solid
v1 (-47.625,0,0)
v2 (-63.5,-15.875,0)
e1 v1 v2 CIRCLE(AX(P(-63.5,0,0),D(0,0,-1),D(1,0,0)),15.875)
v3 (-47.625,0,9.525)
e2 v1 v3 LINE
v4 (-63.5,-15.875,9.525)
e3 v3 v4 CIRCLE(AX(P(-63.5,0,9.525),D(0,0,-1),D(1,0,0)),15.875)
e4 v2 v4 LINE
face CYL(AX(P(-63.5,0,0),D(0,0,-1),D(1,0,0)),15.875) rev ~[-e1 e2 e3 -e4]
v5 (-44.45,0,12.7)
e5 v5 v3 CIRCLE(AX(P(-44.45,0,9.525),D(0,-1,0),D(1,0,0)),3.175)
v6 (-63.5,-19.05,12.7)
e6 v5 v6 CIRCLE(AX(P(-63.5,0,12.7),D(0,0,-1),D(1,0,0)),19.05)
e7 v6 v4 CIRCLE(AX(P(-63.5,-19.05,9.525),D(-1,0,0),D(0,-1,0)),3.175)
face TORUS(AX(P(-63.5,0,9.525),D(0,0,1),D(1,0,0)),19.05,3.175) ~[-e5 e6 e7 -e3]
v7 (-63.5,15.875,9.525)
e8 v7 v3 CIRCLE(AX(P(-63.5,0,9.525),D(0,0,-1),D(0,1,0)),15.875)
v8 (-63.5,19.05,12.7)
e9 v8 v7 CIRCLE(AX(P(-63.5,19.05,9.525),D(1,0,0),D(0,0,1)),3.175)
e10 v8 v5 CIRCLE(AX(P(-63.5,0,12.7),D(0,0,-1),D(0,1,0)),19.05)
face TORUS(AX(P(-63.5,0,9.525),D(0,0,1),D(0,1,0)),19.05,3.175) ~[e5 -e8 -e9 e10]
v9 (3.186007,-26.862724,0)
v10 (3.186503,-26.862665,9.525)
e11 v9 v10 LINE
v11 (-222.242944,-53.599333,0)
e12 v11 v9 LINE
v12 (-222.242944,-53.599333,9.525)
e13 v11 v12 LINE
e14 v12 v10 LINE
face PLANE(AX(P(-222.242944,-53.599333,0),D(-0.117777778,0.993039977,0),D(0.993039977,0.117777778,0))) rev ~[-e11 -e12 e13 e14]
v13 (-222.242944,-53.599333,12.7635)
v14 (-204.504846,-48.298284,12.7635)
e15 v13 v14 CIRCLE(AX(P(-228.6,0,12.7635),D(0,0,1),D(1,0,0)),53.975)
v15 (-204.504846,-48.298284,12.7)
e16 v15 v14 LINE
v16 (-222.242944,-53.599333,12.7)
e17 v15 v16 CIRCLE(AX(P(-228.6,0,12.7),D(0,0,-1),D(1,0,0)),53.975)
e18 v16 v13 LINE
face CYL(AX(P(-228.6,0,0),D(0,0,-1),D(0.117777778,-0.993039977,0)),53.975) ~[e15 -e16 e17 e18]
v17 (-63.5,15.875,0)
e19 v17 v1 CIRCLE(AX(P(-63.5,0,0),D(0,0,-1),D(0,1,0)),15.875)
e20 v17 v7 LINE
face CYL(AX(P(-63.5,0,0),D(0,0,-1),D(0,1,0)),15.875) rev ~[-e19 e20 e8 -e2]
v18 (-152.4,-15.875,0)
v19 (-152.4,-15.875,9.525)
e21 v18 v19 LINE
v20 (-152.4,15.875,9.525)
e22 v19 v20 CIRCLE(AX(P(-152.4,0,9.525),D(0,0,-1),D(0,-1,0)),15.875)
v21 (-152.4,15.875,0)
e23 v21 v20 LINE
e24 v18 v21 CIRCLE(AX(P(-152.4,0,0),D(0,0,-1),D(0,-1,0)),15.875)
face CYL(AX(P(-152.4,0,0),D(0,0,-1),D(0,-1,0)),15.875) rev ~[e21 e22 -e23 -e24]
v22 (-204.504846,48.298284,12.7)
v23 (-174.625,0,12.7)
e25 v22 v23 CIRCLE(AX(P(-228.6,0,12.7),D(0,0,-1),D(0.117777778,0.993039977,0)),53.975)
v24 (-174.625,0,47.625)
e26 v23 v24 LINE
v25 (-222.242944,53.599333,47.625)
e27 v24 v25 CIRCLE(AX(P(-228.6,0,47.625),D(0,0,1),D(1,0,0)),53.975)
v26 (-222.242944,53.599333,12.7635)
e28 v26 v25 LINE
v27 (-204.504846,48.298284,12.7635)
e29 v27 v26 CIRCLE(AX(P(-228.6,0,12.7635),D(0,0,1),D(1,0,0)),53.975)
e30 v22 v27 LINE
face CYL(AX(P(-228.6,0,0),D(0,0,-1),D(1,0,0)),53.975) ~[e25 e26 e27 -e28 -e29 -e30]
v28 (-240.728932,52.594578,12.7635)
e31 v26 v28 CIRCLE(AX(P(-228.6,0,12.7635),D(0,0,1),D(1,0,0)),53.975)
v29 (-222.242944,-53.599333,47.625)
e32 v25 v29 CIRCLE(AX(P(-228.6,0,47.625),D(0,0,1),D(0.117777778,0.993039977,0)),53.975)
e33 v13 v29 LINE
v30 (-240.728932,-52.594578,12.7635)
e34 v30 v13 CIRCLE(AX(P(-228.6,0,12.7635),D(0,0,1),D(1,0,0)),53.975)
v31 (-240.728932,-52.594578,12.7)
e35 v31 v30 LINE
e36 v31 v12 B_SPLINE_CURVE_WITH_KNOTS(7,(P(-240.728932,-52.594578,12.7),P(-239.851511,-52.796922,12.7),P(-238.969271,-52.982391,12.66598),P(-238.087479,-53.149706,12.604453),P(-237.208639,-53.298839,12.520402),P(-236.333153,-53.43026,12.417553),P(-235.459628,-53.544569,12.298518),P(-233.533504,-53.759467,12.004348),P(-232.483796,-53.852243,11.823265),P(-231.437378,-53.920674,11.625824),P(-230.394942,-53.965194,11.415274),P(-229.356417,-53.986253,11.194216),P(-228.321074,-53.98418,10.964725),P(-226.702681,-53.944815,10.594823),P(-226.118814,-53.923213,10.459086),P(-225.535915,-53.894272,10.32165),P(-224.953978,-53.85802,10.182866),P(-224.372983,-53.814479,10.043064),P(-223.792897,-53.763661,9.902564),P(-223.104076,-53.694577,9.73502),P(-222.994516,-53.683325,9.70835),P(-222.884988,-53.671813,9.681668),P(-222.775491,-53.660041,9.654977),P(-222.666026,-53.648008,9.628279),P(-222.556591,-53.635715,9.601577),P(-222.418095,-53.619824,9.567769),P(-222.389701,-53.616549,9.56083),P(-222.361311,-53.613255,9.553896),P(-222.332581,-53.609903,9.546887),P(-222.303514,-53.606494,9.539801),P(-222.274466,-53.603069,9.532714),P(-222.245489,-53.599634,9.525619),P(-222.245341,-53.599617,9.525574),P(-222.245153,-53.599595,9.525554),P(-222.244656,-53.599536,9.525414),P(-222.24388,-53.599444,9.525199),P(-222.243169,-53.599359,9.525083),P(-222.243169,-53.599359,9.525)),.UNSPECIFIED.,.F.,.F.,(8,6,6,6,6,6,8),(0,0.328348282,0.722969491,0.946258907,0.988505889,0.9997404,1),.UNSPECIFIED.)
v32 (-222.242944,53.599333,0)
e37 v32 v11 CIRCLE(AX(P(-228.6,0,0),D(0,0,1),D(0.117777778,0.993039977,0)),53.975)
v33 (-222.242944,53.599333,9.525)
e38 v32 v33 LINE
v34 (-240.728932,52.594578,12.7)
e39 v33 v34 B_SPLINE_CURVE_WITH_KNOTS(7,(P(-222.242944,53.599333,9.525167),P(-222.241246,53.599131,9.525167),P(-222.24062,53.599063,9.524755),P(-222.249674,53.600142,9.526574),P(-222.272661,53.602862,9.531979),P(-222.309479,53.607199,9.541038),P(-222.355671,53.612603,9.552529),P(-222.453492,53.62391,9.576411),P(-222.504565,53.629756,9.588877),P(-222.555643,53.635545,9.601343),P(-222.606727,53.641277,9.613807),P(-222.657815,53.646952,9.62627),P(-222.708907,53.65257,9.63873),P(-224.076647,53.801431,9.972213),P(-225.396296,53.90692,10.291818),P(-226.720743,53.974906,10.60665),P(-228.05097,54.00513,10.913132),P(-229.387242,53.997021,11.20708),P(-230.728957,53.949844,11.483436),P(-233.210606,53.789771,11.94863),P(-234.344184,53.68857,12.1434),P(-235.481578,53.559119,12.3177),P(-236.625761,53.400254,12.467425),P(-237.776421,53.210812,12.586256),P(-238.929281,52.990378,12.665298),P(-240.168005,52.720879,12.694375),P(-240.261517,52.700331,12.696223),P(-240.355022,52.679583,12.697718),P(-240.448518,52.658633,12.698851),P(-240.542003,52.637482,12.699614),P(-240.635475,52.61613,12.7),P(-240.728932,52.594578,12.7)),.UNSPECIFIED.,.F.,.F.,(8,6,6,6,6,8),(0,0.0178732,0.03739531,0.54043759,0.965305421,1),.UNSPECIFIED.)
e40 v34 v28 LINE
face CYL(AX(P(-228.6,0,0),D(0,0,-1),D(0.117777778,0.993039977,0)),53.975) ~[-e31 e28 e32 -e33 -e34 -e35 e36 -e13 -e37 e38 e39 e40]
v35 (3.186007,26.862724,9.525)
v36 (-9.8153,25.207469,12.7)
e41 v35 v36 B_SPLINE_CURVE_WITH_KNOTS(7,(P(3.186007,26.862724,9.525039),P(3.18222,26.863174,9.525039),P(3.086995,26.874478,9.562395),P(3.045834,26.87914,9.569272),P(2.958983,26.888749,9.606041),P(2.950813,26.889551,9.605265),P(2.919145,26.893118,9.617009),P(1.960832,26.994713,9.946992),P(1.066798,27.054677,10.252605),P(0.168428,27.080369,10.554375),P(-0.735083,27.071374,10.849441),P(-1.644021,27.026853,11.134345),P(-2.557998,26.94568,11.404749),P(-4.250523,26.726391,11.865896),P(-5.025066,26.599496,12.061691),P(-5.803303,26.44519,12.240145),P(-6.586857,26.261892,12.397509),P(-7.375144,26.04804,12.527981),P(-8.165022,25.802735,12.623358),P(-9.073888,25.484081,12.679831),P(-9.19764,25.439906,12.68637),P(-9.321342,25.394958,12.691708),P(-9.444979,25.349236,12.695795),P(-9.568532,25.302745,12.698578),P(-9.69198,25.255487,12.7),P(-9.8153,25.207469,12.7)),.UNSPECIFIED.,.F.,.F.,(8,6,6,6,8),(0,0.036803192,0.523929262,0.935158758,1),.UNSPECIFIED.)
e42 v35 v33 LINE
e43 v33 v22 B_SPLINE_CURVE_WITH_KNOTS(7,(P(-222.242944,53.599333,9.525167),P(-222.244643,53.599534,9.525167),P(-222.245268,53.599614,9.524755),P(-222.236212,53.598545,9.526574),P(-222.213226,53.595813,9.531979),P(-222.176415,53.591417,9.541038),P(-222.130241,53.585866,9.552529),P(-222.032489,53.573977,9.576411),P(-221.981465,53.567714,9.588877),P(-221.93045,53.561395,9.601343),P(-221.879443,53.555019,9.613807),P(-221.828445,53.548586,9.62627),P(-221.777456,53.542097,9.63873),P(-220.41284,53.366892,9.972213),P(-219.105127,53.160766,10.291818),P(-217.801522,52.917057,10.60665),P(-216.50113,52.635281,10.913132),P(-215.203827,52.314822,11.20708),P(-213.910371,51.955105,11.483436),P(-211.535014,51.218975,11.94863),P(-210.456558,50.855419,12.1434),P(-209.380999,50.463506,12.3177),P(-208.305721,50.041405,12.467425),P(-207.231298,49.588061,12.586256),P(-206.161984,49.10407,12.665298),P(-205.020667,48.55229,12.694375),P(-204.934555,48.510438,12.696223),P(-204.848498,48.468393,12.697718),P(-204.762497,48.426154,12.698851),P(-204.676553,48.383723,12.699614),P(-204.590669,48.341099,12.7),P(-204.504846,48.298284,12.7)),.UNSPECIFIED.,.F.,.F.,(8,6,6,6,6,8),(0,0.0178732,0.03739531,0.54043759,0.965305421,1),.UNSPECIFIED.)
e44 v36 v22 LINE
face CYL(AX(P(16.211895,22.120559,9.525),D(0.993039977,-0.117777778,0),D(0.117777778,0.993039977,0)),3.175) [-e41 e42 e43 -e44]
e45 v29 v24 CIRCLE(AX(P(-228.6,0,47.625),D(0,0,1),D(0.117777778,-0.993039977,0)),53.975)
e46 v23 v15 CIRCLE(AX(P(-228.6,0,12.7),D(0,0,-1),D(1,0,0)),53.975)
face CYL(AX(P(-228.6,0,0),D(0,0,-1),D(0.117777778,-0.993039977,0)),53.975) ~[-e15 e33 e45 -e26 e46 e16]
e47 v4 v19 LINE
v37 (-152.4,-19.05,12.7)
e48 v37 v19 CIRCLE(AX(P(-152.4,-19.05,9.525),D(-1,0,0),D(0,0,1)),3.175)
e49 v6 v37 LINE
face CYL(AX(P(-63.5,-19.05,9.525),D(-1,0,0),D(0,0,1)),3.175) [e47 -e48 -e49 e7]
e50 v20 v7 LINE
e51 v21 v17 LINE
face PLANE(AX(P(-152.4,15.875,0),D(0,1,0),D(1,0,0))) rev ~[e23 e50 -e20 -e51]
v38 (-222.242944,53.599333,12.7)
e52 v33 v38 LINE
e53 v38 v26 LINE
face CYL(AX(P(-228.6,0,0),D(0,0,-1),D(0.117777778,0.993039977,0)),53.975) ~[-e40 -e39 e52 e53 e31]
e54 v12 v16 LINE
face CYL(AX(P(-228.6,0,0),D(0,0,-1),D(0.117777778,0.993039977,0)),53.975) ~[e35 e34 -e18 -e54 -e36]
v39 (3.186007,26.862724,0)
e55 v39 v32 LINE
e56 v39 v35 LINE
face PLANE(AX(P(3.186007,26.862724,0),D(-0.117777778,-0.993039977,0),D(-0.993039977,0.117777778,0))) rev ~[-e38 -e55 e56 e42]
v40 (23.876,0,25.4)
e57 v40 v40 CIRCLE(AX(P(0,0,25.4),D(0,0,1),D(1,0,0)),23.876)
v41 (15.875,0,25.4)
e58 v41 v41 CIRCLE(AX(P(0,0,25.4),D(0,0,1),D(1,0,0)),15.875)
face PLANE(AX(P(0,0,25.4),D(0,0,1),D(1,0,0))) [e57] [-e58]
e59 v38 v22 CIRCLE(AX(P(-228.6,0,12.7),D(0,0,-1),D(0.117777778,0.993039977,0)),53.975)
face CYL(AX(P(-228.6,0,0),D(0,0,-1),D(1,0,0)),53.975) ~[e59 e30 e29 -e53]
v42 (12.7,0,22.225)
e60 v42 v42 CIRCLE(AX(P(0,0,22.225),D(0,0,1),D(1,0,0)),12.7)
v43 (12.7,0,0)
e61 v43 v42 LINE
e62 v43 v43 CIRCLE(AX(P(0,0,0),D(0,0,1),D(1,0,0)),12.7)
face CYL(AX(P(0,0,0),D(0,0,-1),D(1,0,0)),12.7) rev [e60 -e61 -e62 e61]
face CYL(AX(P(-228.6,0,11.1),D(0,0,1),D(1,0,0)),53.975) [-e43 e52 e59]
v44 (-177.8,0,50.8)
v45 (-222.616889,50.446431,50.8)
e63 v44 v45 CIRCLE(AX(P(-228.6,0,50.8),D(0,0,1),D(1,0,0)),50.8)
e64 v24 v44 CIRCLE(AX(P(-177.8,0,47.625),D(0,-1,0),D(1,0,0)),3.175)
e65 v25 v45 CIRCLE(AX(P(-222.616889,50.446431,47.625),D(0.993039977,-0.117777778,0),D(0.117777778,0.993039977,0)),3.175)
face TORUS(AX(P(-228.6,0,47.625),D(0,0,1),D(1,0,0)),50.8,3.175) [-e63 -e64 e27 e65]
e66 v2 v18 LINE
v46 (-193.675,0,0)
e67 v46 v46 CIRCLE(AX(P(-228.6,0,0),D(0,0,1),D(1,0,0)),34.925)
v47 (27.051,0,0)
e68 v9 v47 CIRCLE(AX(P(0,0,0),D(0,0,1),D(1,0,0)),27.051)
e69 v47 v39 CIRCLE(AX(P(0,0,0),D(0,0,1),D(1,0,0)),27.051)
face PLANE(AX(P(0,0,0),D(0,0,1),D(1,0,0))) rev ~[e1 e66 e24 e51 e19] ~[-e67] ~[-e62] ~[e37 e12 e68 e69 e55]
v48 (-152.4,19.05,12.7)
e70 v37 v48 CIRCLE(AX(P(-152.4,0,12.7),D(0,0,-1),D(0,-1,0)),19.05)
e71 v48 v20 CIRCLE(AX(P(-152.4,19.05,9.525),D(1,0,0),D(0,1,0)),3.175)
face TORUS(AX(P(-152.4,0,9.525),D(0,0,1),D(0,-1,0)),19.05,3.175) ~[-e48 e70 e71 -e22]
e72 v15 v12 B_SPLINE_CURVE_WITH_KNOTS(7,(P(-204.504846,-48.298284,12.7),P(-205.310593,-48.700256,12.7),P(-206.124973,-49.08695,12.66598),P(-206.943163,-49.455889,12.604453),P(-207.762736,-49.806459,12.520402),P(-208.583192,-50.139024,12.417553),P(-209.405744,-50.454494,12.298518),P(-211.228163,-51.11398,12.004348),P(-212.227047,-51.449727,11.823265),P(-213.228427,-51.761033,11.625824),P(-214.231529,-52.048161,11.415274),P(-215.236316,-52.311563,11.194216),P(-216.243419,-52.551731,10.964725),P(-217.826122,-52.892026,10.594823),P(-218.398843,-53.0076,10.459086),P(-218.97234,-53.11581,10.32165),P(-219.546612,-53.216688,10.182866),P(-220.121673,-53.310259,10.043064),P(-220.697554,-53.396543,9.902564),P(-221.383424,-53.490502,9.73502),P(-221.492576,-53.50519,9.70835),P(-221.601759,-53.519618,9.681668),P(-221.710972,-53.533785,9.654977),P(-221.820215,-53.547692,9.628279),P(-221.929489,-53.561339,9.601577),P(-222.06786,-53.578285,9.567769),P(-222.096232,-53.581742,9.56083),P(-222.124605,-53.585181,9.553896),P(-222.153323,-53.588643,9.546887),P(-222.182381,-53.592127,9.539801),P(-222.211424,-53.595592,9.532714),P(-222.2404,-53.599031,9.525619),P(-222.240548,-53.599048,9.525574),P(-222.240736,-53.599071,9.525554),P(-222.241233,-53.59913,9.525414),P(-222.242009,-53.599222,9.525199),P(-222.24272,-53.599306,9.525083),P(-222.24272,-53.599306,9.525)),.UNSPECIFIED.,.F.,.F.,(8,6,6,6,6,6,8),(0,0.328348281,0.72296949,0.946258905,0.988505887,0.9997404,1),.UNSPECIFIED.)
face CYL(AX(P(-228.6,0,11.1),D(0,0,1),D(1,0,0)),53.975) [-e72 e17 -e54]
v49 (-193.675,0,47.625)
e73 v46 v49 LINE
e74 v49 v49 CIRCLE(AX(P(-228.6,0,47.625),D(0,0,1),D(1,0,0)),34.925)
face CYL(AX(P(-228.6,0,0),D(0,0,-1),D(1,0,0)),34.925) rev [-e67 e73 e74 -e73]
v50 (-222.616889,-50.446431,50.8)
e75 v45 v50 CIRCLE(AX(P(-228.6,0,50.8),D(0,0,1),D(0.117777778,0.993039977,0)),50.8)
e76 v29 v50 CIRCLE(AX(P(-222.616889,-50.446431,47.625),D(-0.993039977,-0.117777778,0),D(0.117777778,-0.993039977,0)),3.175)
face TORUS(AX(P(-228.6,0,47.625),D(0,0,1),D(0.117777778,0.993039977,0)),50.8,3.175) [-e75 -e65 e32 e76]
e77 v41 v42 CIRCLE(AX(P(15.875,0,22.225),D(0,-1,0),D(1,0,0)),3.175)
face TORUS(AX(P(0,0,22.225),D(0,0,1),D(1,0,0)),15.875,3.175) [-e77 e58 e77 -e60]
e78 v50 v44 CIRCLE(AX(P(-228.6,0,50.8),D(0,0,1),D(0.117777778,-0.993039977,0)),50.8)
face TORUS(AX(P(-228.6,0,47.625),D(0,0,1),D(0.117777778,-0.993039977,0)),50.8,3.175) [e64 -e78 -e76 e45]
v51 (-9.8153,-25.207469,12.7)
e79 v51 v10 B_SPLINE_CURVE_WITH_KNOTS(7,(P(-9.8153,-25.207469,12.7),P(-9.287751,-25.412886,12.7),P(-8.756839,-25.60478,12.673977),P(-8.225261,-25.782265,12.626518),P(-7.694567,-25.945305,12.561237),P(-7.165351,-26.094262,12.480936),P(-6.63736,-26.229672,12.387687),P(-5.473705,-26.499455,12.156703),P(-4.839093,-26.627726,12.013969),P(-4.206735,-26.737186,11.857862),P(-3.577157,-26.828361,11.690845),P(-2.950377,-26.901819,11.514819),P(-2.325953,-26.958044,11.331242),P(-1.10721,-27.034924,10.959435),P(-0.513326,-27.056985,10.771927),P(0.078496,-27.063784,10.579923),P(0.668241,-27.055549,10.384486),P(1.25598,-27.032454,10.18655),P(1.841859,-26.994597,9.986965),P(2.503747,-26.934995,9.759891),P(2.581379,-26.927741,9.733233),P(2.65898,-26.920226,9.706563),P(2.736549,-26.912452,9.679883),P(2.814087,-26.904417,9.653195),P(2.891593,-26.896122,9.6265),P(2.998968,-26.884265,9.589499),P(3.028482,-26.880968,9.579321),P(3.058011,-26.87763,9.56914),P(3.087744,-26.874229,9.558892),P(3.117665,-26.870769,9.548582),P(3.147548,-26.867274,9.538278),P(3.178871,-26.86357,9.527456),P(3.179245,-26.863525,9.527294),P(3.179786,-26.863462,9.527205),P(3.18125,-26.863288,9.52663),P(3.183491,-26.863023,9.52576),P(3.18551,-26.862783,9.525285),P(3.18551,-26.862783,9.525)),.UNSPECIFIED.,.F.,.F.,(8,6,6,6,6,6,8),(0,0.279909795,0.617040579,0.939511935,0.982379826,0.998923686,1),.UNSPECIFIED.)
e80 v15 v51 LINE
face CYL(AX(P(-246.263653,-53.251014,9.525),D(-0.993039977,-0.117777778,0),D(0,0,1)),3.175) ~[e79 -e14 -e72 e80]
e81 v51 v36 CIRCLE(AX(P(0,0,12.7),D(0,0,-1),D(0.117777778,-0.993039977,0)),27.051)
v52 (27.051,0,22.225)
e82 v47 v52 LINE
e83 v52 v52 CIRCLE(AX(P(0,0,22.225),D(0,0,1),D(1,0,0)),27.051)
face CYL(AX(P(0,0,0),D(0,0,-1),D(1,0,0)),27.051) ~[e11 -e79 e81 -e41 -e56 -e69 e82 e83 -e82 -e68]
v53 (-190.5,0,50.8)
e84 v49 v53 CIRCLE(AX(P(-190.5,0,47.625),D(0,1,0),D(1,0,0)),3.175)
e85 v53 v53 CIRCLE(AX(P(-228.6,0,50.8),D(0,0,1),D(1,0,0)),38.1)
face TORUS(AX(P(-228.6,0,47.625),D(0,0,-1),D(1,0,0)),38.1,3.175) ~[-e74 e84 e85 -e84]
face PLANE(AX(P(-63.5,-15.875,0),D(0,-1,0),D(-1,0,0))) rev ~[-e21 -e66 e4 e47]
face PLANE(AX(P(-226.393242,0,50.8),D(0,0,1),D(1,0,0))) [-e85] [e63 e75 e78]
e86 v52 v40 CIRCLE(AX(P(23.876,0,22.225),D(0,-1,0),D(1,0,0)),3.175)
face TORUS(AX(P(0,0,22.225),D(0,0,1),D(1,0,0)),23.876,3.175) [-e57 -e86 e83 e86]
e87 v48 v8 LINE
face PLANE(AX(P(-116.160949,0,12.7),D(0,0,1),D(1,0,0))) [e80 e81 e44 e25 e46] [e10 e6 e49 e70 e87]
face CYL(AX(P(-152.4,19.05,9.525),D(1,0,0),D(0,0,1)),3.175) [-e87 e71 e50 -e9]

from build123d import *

# Parameters (mm, degrees)
F0_R         = 34.925
F1_DEPTH     = 50.8
F2_DEPTH     = 12.7
F0_R_2       = 12.7
F3_DEPTH     = 25.4
F4_F1_R      = 3.175
F4_F2_R      = 3.175
F4_F3_R      = 3.175
F4_F4_R      = 3.175
F4_F5_R      = 3.175
F4_T9_DEPTH  = 264.3151886434
F4_S10_R     = 27.051
F4_T11_DEPTH = 134
F4_S12_R     = 53.975
F4_T13_DEPTH = 134
F4_T17_DEPTH = 264.3151886434
F4_S18_R     = 27.051
F4_T19_DEPTH = 134
F4_S20_R     = 53.975
F4_T21_DEPTH = 134


# Not quite as in the source:
# - a fillet or chamfer that OpenCascade refuses, or shapes differently, is made with other operations: its cross-section is extruded or revolved along the edge and cut away or added


with BuildPart() as f1:
    # F0 (on Top) → F1 (new body)
    with BuildSketch(Plane.XY):
        with BuildLine():
            ThreePointArc((-174.625, 0), (-188.2488990323, 35.8481418723), (-222.2429444444, 53.5993327352))
            ThreePointArc((-222.2429444444, 53.5993327352), (-282.575, 0), (-222.2429444444, -53.5993327352))
            ThreePointArc((-222.2429444444, -53.5993327352), (-188.2488990323, -35.8481418723), (-174.625, 0))
        make_face()
        with Locations((-228.6, 0)):
            Circle(F0_R, mode=Mode.SUBTRACT)
    extrude(amount=F1_DEPTH)

    # F0 (on Top) → F2 (join)
    with BuildSketch(Plane.XY):
        with BuildLine():
            ThreePointArc((3.1860066667, -26.8627244061), (-27.051, 0), (3.1860066667, 26.8627244061))
            Line((3.1860066667, 26.8627244061), (-222.2429444444, 53.5993327352))
            ThreePointArc((-222.2429444444, 53.5993327352), (-188.2488990323, 35.8481418723), (-174.625, 0))
            ThreePointArc((-174.625, 0), (-188.2488990323, -35.8481418723), (-222.2429444444, -53.5993327352))
            Line((-222.2429444444, -53.5993327352), (3.1860066667, -26.8627244061))
        make_face()
        with BuildLine():
            ThreePointArc((-63.5, 15.875), (-52.2746798487, 11.2253201513), (-47.625, 0))
            ThreePointArc((-47.625, 0), (-52.2746798487, -11.2253201513), (-63.5, -15.875))
            Line((-63.5, -15.875), (-152.4, -15.875))
            ThreePointArc((-152.4, -15.875), (-168.275, 0), (-152.4, 15.875))
            Line((-152.4, 15.875), (-63.5, 15.875))
        make_face(mode=Mode.SUBTRACT)
    extrude(amount=F2_DEPTH)

    # F0 (on Top) → F3 (join)
    with BuildSketch(Plane.XY):
        with BuildLine():
            ThreePointArc((3.1860066667, -26.8627244061), (20.2230223673, -17.9662452207), (27.051, 0))
            ThreePointArc((27.051, 0), (20.2230223673, 17.9662452207), (3.1860066667, 26.8627244061))
            ThreePointArc((3.1860066667, 26.8627244061), (-27.051, 0), (3.1860066667, -26.8627244061))
        make_face()
        Circle(F0_R_2, mode=Mode.SUBTRACT)
    extrude(amount=F3_DEPTH)

    # F4: fillet of radius 3.175 on 10 edges, made by hand

    # F4_f1
    f4_f1_edges = [f1.edges().sort_by_distance(p)[0] for p in [
        (-234.9570555556, 53.5993327352, 50.8),
    ]]
    fillet(f4_f1_edges, radius=F4_F1_R)

    # F4_f2
    f4_f2_edges = [f1.edges().sort_by_distance(p)[0] for p in [
        (-47.625, 0, 12.7),
        (-107.95, -15.875, 12.7),
        (-168.275, 0, 12.7),
        (-107.95, 15.875, 12.7),
    ]]
    fillet(f4_f2_edges, radius=F4_F2_R)

    # F4_f3
    f4_f3_edges = [f1.edges().sort_by_distance(p)[0] for p in [
        (-263.525, 0, 50.8),
    ]]
    fillet(f4_f3_edges, radius=F4_F3_R)

    # F4_f4
    f4_f4_edges = [f1.edges().sort_by_distance(p)[0] for p in [
        (-3.1860066667, 26.8627244061, 25.4),
    ]]
    fillet(f4_f4_edges, radius=F4_F4_R)

    # F4_f5
    f4_f5_edges = [f1.edges().sort_by_distance(p)[0] for p in [
        (-12.7, 0, 25.4),
    ]]
    fillet(f4_f5_edges, radius=F4_F5_R)


with BuildPart() as f4_tool7:
    # F4_s8 → F4_t9 (new body)
    with BuildSketch(Plane(origin=(-249.0757155531, -29.5411916624, 0), x_dir=(0, 0, 1), z_dir=(0.9930399766, 0.1177777778, 0))):
        with BuildLine():
            ThreePointArc((12.7, 23.876), (11.7700640303, 26.1210640303), (9.525, 27.051))
            Line((9.525, 27.051), (9.525, 27.1145))
            Line((9.525, 27.1145), (12.7635, 27.1145))
            Line((12.7635, 27.1145), (12.7635, 23.876))
            Line((12.7635, 23.876), (12.7, 23.876))
        make_face()
    extrude(amount=F4_T9_DEPTH)

    # F4_s10 → F4_t11 (cut, symmetric)
    with BuildSketch(Plane.XY.offset(11.1)):
        Circle(F4_S10_R)
    extrude(amount=F4_T11_DEPTH, both=True, mode=Mode.SUBTRACT)

    # F4_s12 → F4_t13 (cut, symmetric)
    with BuildSketch(Plane.XY.offset(11.1)):
        with Locations((-228.6, 0)):
            Circle(F4_S12_R)
    extrude(amount=F4_T13_DEPTH, both=True, mode=Mode.SUBTRACT)


with BuildPart() as f1_1:
    add(f1.part)

    # F4_t6: cut F4_tool7
    add(f4_tool7.part, mode=Mode.SUBTRACT)


with BuildPart() as f4_tool15:
    # F4_s16 → F4_t17 (new body)
    with BuildSketch(Plane(origin=(13.3998331838, -1.5892638889, 0), x_dir=(0, 0, 1), z_dir=(-0.9930399766, 0.1177777778, 0))):
        with BuildLine():
            ThreePointArc((9.525, 27.051), (11.7700640303, 26.1210640303), (12.7, 23.876))
            Line((12.7, 23.876), (12.7635, 23.876))
            Line((12.7635, 23.876), (12.7635, 27.1145))
            Line((12.7635, 27.1145), (9.525, 27.1145))
            Line((9.525, 27.1145), (9.525, 27.051))
        make_face()
    extrude(amount=F4_T17_DEPTH)

    # F4_s18 → F4_t19 (cut, symmetric)
    with BuildSketch(Plane.XY.offset(11.1)):
        Circle(F4_S18_R)
    extrude(amount=F4_T19_DEPTH, both=True, mode=Mode.SUBTRACT)

    # F4_s20 → F4_t21 (cut, symmetric)
    with BuildSketch(Plane.XY.offset(11.1)):
        with Locations((-228.6, 0)):
            Circle(F4_S20_R)
    extrude(amount=F4_T21_DEPTH, both=True, mode=Mode.SUBTRACT)


with BuildPart() as f1_2:
    add(f1_1.part)

    # F4_t14: cut F4_tool15
    add(f4_tool15.part, mode=Mode.SUBTRACT)


solid = f1_2.part
